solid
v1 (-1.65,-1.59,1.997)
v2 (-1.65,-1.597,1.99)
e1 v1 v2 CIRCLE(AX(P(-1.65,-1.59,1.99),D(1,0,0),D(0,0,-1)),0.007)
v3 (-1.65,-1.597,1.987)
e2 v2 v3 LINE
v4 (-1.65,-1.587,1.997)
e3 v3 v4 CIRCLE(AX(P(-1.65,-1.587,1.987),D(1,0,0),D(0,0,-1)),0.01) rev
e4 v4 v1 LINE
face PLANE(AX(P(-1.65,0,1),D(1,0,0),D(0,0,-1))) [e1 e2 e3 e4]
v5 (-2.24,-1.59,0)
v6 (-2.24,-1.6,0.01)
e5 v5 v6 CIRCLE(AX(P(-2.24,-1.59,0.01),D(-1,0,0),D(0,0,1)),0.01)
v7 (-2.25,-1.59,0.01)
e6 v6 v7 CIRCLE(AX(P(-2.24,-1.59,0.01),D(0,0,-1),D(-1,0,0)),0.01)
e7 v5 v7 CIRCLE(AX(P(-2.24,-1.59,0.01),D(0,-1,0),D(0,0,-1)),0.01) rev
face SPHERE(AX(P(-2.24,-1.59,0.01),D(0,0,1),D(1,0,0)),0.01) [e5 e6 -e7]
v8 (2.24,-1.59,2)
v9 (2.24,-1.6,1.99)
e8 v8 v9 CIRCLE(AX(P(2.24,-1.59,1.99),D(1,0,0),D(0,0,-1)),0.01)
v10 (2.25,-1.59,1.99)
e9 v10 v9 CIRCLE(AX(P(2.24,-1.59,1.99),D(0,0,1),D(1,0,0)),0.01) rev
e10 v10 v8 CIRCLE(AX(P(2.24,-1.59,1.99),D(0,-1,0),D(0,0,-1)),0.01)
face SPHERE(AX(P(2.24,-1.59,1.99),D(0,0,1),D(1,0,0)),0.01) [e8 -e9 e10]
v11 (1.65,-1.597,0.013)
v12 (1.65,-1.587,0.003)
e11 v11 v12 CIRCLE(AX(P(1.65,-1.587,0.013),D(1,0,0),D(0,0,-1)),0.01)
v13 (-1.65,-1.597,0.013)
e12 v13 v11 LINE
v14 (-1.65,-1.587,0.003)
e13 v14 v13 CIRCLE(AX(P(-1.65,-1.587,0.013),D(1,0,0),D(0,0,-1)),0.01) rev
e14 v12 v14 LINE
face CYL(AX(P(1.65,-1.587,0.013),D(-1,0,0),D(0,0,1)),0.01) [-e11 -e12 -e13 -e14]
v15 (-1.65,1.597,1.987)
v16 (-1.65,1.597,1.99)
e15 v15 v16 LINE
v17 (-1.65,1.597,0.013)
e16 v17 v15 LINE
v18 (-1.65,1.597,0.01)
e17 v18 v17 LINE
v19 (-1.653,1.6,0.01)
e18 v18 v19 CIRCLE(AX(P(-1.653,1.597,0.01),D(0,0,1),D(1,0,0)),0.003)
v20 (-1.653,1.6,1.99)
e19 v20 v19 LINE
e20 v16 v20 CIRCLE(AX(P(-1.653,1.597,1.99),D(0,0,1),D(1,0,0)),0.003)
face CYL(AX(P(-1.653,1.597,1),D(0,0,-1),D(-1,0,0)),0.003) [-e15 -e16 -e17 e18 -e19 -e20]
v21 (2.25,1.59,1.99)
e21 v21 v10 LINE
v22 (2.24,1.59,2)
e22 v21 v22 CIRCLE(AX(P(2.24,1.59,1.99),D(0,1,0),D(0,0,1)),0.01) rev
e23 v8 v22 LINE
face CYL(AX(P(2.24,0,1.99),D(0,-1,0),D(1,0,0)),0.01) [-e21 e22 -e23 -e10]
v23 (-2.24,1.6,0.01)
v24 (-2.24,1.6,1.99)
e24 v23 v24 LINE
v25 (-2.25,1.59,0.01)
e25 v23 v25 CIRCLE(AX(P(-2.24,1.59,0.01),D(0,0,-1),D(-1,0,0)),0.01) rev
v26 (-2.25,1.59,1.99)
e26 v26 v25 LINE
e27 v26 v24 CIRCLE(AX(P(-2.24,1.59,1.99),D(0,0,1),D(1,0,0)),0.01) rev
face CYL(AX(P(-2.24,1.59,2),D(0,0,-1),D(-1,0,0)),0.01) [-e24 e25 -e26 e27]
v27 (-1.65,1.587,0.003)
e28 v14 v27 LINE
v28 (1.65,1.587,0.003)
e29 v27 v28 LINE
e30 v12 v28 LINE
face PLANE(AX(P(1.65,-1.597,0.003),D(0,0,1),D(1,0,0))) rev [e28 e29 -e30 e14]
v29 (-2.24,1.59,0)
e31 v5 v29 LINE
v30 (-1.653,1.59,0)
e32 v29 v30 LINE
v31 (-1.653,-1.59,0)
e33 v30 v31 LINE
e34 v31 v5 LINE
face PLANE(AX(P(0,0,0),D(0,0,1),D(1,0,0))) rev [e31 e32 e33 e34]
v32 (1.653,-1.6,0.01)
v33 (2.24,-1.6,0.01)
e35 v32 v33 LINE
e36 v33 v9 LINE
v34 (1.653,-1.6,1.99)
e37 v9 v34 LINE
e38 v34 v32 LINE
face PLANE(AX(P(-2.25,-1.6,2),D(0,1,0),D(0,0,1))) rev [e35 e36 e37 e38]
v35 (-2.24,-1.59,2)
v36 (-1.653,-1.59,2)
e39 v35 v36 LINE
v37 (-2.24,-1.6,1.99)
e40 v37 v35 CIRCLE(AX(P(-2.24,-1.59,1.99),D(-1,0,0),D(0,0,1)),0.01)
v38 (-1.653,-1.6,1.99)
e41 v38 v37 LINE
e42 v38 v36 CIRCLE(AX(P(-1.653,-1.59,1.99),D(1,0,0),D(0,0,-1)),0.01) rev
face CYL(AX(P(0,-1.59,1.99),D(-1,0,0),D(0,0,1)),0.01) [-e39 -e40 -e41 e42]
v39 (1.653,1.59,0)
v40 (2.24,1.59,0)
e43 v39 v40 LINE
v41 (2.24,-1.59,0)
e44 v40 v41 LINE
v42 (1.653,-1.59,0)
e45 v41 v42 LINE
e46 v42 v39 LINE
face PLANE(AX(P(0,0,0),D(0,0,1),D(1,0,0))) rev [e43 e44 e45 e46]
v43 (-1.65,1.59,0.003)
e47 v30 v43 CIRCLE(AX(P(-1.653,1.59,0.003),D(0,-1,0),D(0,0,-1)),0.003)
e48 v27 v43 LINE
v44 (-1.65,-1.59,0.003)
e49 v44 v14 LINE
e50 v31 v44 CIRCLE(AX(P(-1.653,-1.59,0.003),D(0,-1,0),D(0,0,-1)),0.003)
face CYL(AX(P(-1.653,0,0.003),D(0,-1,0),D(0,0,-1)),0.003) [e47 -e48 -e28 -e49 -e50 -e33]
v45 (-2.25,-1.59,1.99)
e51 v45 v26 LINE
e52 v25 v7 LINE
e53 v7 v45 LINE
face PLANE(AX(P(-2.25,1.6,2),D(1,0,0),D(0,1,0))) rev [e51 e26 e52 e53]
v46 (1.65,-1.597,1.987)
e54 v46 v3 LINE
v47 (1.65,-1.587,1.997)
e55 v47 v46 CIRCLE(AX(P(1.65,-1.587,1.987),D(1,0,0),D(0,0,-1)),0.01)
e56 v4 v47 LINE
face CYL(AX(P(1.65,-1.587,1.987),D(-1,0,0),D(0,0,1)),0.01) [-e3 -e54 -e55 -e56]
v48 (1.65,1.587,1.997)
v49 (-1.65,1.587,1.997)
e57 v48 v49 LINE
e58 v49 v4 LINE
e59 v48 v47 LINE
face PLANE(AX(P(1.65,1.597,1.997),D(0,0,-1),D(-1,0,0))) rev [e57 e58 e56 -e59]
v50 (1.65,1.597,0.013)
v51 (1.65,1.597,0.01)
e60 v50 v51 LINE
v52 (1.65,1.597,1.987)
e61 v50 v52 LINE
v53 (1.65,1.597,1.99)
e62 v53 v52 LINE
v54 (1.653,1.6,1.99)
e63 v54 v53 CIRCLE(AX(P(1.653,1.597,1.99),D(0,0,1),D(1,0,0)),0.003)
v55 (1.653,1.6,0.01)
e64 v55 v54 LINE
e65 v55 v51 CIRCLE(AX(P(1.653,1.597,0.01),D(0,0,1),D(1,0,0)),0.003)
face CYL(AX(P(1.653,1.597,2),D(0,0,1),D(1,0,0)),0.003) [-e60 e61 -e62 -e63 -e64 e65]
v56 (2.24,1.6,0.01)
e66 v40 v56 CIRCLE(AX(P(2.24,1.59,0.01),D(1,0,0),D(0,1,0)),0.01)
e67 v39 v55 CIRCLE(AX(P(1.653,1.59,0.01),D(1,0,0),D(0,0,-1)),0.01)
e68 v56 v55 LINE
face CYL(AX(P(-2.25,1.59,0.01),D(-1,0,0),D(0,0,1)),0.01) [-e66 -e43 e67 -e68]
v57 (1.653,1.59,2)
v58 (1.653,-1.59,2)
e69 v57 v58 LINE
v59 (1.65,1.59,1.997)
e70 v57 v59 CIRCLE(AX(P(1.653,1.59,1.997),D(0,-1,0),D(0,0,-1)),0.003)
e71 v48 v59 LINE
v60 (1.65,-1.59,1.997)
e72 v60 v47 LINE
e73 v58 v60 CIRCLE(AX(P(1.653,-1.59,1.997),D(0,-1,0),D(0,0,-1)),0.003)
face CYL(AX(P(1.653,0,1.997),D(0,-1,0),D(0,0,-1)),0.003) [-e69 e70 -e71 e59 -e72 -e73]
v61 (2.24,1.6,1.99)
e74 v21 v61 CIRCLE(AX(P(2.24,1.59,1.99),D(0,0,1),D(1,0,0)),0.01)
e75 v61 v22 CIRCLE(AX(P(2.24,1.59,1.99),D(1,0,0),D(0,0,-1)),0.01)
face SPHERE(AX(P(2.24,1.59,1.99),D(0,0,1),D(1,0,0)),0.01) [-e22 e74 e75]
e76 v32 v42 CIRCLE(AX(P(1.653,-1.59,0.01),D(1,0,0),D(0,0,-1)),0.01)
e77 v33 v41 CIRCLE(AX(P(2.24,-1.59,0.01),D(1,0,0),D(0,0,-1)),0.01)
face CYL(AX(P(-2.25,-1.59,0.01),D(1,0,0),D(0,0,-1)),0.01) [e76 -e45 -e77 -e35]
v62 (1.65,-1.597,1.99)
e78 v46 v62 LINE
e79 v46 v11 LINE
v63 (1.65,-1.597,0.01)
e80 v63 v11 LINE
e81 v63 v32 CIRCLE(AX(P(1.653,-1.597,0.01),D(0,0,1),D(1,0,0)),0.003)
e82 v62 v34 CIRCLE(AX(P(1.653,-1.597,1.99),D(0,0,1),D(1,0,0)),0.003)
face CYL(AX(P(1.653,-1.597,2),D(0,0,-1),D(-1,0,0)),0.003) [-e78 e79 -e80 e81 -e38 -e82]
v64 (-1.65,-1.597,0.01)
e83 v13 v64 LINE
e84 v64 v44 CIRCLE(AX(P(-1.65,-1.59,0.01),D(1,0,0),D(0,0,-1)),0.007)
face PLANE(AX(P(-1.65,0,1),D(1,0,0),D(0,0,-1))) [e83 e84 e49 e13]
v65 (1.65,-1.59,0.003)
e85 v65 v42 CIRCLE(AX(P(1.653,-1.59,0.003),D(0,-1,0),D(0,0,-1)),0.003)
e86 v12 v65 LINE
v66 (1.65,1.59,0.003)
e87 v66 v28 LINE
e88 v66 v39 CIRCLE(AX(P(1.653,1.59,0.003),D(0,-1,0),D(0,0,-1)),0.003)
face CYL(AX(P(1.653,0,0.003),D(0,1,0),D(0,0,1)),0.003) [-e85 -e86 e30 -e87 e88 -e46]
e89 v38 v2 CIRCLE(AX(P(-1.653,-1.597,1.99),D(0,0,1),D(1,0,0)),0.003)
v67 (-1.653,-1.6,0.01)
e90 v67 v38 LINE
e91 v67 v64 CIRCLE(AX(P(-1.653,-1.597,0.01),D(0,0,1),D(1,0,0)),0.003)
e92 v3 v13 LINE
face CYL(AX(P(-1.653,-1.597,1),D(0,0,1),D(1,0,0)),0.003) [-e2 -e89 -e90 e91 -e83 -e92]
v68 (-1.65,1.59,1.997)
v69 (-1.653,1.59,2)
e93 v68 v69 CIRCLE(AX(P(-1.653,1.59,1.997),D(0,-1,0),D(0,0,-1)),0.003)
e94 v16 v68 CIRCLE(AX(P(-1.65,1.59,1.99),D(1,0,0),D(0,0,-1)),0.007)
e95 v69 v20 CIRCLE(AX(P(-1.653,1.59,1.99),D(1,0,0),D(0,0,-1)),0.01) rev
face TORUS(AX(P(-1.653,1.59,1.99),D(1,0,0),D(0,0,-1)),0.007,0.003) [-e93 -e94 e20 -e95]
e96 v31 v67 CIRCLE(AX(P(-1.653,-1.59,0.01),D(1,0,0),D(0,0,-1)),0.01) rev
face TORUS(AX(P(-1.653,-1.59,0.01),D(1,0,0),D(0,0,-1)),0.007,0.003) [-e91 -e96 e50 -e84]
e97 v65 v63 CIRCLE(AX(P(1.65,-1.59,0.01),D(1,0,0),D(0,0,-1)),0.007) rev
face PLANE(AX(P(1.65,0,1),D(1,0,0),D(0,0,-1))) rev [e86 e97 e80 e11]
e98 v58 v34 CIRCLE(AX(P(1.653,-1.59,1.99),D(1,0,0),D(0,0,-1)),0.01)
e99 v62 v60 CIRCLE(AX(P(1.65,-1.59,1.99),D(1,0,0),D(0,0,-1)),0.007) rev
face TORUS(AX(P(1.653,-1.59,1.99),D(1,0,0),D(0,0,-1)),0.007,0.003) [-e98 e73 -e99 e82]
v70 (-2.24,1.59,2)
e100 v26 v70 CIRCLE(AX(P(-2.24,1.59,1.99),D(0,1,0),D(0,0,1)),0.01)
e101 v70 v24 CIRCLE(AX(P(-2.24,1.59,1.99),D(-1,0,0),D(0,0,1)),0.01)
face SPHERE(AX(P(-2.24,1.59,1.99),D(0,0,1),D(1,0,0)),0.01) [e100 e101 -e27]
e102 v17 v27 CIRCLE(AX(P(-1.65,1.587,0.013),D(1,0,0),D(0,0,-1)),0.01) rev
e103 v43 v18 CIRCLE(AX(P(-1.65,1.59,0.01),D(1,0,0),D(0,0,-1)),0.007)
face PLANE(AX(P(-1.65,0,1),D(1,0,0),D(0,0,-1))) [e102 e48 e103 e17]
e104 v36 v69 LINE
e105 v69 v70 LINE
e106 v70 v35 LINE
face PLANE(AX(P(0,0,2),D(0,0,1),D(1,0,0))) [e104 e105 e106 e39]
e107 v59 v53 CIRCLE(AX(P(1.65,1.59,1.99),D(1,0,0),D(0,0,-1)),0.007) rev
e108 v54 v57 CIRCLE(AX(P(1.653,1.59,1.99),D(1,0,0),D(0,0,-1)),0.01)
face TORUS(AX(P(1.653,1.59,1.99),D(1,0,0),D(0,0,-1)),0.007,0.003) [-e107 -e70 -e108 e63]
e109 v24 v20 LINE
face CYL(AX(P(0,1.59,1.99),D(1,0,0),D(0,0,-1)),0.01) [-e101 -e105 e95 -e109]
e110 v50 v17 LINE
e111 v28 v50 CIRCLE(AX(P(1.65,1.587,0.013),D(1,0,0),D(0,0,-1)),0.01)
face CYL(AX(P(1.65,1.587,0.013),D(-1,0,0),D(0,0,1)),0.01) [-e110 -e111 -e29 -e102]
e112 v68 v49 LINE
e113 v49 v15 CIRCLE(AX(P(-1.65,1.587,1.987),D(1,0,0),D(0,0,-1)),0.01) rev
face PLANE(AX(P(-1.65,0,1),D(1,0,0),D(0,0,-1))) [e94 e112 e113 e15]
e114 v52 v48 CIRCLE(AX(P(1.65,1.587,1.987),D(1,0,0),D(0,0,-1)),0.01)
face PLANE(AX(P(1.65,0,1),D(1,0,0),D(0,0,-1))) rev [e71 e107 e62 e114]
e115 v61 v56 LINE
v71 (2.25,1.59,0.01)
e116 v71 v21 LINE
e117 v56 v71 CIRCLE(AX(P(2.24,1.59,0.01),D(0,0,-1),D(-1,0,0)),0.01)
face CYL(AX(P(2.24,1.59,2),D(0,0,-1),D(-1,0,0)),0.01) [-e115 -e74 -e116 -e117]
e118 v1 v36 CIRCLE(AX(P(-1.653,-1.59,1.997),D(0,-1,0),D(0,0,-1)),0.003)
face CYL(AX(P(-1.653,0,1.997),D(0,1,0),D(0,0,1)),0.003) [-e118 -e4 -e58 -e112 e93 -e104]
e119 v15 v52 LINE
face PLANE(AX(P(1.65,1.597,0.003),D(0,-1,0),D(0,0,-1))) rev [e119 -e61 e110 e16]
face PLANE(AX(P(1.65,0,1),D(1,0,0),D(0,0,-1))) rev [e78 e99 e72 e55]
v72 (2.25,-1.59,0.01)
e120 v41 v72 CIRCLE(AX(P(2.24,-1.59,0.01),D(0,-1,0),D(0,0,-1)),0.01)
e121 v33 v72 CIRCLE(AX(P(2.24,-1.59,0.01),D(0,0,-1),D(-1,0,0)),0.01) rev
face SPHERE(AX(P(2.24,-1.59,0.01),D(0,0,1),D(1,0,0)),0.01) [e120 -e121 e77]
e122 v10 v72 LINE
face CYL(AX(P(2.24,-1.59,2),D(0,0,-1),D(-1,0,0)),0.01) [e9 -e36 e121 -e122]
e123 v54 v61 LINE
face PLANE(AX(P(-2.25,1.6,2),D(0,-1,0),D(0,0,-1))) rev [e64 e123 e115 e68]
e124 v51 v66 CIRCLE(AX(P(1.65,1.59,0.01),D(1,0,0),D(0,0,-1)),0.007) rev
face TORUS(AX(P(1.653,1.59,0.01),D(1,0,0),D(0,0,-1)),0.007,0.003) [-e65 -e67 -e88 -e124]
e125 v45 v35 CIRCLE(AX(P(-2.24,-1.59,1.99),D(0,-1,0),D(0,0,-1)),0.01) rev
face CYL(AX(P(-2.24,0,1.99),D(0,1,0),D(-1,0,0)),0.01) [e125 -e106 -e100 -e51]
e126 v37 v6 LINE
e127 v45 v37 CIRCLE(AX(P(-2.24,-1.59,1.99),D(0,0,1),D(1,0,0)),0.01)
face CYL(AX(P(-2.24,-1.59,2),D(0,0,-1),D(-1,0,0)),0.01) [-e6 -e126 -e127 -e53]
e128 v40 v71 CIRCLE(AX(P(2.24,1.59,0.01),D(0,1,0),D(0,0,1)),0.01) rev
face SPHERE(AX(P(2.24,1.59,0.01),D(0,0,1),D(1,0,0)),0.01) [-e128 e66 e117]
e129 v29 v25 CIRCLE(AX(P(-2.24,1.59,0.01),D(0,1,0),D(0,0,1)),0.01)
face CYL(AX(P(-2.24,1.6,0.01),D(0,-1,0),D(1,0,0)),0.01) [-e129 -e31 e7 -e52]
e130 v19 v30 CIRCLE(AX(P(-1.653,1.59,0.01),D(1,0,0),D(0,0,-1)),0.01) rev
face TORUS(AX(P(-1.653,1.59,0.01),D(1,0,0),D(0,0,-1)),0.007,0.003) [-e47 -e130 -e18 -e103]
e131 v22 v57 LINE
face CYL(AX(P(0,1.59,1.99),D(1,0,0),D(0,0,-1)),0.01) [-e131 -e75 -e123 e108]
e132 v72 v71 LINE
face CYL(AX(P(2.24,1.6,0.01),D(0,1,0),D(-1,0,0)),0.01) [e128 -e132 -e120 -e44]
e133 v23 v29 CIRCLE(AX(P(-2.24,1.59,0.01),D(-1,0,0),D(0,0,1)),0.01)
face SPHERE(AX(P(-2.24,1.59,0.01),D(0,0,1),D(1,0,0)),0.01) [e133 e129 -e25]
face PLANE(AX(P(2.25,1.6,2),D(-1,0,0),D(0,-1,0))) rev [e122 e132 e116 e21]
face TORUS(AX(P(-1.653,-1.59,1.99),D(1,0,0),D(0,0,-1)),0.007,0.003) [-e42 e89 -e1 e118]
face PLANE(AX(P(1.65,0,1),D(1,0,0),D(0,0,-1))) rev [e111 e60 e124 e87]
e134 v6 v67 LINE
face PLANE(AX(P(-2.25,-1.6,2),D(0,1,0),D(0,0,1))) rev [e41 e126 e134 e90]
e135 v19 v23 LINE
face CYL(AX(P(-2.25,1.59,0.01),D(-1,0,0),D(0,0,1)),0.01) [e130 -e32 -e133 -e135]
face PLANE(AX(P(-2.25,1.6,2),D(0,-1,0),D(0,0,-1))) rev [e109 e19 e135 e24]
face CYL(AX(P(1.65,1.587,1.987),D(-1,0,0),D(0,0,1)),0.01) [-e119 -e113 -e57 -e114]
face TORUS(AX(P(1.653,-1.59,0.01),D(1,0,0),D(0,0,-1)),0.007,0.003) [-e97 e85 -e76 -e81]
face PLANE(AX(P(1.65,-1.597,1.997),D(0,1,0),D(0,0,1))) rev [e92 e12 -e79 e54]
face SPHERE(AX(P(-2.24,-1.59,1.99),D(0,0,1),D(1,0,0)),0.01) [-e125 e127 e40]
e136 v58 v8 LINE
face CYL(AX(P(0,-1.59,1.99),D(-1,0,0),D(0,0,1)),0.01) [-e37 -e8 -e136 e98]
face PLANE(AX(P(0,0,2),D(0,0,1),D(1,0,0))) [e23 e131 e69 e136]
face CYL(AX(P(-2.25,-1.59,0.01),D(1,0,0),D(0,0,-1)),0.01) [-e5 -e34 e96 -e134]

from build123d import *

# Parameters (mm, degrees)
SKETCH1_W                           = 4.5
SKETCH1_H                           = 3.2
ALL_BODY_DEPTH                      = 2
CUT_OUT_THE_BODY_FOR_PIN_DEPTH      = 1.65
CUT_OUT_THE_BODY_FOR_PIN_DEPTH_BACK = 1.65
SKETCH2_OUTSIDE_W                   = 5.174
SKETCH2_OUTSIDE_H                   = 6.374
SKETCH2_OUTSIDE_W_2                 = 1.994
SKETCH2_OUTSIDE_H_2                 = 3.194
BODY_FILLET_R                       = 0.01
PIN_FILLET_A_R                      = 0.01
PIN_FILLET_B_R                      = 0.003


with BuildPart() as part:
    # Sketch1 → All body (new body)
    with BuildSketch(Plane.XY):
        Rectangle(SKETCH1_W, SKETCH1_H)
    extrude(amount=ALL_BODY_DEPTH)

    # Sketch2 outside → Cut out the body for pin (cut, two sides: drawn at the far end of the back side and taken through both)
    with BuildSketch(Plane(origin=(0, 0, 0), x_dir=(0, 0, -1), z_dir=(1, 0, 0)).offset(-CUT_OUT_THE_BODY_FOR_PIN_DEPTH_BACK)):
        with Locations((-1, 0)):
            Rectangle(SKETCH2_OUTSIDE_W, SKETCH2_OUTSIDE_H)
        with Locations((-1, 0)):
            Rectangle(SKETCH2_OUTSIDE_W_2, SKETCH2_OUTSIDE_H_2, mode=Mode.SUBTRACT)
    extrude(amount=CUT_OUT_THE_BODY_FOR_PIN_DEPTH + CUT_OUT_THE_BODY_FOR_PIN_DEPTH_BACK, mode=Mode.SUBTRACT)

    # Body fillet
    body_fillet_edges = [part.edges().sort_by_distance(p)[0] for p in [
        (0, 1.597, 0.003),
        (0, 1.597, 1.997),
        (0, -1.597, 1.997),
        (0, -1.597, 0.003),
    ]]
    fillet(body_fillet_edges, radius=BODY_FILLET_R)

    # Pin fillet a
    pin_fillet_a_edges = [part.edges().sort_by_distance(p)[0] for p in [
        (2.25, 0, 2),
        (-1.95, 1.6, 0),
        (1.95, -1.6, 0),
        (1.95, -1.6, 2),
        (-1.95, 1.6, 2),
        (1.95, 1.6, 2),
        (-2.25, 0, 2),
        (1.95, 1.6, 0),
        (2.25, 0, 0),
        (-1.95, -1.6, 0),
        (-2.25, 0, 0),
        (-2.25, 1.6, 1),
        (2.25, 1.6, 1),
        (2.25, -1.6, 1),
        (-2.25, -1.6, 1),
        (-1.95, -1.6, 2),
    ]]
    fillet(pin_fillet_a_edges, radius=PIN_FILLET_A_R)

    # Pin fillet b
    pin_fillet_b_edges = [part.edges().sort_by_distance(p)[0] for p in [
        (1.65, -1.6, 1),
        (1.65, 0, 2),
        (1.65, 1.6, 1),
        (1.65, 0, 0),
        (-1.65, 1.6, 1),
        (-1.65, 0, 2),
        (-1.65, -1.6, 1),
        (-1.65, 0, 0),
        (1.65, 1.597071068, 0.002928932),
        (1.65, -1.597071068, 0.002928932),
        (1.65, -1.597071068, 1.997071068),
        (1.65, 1.597071068, 1.997071068),
        (-1.65, -1.597071068, 1.997071068),
        (-1.65, 1.597071068, 1.997071068),
        (-1.65, -1.597071068, 0.002928932),
        (-1.65, 1.597071068, 0.002928932),
    ]]
    fillet(pin_fillet_b_edges, radius=PIN_FILLET_B_R - 0.0001)  # a hair under: the kernel refuses the full size


solid = part.part
